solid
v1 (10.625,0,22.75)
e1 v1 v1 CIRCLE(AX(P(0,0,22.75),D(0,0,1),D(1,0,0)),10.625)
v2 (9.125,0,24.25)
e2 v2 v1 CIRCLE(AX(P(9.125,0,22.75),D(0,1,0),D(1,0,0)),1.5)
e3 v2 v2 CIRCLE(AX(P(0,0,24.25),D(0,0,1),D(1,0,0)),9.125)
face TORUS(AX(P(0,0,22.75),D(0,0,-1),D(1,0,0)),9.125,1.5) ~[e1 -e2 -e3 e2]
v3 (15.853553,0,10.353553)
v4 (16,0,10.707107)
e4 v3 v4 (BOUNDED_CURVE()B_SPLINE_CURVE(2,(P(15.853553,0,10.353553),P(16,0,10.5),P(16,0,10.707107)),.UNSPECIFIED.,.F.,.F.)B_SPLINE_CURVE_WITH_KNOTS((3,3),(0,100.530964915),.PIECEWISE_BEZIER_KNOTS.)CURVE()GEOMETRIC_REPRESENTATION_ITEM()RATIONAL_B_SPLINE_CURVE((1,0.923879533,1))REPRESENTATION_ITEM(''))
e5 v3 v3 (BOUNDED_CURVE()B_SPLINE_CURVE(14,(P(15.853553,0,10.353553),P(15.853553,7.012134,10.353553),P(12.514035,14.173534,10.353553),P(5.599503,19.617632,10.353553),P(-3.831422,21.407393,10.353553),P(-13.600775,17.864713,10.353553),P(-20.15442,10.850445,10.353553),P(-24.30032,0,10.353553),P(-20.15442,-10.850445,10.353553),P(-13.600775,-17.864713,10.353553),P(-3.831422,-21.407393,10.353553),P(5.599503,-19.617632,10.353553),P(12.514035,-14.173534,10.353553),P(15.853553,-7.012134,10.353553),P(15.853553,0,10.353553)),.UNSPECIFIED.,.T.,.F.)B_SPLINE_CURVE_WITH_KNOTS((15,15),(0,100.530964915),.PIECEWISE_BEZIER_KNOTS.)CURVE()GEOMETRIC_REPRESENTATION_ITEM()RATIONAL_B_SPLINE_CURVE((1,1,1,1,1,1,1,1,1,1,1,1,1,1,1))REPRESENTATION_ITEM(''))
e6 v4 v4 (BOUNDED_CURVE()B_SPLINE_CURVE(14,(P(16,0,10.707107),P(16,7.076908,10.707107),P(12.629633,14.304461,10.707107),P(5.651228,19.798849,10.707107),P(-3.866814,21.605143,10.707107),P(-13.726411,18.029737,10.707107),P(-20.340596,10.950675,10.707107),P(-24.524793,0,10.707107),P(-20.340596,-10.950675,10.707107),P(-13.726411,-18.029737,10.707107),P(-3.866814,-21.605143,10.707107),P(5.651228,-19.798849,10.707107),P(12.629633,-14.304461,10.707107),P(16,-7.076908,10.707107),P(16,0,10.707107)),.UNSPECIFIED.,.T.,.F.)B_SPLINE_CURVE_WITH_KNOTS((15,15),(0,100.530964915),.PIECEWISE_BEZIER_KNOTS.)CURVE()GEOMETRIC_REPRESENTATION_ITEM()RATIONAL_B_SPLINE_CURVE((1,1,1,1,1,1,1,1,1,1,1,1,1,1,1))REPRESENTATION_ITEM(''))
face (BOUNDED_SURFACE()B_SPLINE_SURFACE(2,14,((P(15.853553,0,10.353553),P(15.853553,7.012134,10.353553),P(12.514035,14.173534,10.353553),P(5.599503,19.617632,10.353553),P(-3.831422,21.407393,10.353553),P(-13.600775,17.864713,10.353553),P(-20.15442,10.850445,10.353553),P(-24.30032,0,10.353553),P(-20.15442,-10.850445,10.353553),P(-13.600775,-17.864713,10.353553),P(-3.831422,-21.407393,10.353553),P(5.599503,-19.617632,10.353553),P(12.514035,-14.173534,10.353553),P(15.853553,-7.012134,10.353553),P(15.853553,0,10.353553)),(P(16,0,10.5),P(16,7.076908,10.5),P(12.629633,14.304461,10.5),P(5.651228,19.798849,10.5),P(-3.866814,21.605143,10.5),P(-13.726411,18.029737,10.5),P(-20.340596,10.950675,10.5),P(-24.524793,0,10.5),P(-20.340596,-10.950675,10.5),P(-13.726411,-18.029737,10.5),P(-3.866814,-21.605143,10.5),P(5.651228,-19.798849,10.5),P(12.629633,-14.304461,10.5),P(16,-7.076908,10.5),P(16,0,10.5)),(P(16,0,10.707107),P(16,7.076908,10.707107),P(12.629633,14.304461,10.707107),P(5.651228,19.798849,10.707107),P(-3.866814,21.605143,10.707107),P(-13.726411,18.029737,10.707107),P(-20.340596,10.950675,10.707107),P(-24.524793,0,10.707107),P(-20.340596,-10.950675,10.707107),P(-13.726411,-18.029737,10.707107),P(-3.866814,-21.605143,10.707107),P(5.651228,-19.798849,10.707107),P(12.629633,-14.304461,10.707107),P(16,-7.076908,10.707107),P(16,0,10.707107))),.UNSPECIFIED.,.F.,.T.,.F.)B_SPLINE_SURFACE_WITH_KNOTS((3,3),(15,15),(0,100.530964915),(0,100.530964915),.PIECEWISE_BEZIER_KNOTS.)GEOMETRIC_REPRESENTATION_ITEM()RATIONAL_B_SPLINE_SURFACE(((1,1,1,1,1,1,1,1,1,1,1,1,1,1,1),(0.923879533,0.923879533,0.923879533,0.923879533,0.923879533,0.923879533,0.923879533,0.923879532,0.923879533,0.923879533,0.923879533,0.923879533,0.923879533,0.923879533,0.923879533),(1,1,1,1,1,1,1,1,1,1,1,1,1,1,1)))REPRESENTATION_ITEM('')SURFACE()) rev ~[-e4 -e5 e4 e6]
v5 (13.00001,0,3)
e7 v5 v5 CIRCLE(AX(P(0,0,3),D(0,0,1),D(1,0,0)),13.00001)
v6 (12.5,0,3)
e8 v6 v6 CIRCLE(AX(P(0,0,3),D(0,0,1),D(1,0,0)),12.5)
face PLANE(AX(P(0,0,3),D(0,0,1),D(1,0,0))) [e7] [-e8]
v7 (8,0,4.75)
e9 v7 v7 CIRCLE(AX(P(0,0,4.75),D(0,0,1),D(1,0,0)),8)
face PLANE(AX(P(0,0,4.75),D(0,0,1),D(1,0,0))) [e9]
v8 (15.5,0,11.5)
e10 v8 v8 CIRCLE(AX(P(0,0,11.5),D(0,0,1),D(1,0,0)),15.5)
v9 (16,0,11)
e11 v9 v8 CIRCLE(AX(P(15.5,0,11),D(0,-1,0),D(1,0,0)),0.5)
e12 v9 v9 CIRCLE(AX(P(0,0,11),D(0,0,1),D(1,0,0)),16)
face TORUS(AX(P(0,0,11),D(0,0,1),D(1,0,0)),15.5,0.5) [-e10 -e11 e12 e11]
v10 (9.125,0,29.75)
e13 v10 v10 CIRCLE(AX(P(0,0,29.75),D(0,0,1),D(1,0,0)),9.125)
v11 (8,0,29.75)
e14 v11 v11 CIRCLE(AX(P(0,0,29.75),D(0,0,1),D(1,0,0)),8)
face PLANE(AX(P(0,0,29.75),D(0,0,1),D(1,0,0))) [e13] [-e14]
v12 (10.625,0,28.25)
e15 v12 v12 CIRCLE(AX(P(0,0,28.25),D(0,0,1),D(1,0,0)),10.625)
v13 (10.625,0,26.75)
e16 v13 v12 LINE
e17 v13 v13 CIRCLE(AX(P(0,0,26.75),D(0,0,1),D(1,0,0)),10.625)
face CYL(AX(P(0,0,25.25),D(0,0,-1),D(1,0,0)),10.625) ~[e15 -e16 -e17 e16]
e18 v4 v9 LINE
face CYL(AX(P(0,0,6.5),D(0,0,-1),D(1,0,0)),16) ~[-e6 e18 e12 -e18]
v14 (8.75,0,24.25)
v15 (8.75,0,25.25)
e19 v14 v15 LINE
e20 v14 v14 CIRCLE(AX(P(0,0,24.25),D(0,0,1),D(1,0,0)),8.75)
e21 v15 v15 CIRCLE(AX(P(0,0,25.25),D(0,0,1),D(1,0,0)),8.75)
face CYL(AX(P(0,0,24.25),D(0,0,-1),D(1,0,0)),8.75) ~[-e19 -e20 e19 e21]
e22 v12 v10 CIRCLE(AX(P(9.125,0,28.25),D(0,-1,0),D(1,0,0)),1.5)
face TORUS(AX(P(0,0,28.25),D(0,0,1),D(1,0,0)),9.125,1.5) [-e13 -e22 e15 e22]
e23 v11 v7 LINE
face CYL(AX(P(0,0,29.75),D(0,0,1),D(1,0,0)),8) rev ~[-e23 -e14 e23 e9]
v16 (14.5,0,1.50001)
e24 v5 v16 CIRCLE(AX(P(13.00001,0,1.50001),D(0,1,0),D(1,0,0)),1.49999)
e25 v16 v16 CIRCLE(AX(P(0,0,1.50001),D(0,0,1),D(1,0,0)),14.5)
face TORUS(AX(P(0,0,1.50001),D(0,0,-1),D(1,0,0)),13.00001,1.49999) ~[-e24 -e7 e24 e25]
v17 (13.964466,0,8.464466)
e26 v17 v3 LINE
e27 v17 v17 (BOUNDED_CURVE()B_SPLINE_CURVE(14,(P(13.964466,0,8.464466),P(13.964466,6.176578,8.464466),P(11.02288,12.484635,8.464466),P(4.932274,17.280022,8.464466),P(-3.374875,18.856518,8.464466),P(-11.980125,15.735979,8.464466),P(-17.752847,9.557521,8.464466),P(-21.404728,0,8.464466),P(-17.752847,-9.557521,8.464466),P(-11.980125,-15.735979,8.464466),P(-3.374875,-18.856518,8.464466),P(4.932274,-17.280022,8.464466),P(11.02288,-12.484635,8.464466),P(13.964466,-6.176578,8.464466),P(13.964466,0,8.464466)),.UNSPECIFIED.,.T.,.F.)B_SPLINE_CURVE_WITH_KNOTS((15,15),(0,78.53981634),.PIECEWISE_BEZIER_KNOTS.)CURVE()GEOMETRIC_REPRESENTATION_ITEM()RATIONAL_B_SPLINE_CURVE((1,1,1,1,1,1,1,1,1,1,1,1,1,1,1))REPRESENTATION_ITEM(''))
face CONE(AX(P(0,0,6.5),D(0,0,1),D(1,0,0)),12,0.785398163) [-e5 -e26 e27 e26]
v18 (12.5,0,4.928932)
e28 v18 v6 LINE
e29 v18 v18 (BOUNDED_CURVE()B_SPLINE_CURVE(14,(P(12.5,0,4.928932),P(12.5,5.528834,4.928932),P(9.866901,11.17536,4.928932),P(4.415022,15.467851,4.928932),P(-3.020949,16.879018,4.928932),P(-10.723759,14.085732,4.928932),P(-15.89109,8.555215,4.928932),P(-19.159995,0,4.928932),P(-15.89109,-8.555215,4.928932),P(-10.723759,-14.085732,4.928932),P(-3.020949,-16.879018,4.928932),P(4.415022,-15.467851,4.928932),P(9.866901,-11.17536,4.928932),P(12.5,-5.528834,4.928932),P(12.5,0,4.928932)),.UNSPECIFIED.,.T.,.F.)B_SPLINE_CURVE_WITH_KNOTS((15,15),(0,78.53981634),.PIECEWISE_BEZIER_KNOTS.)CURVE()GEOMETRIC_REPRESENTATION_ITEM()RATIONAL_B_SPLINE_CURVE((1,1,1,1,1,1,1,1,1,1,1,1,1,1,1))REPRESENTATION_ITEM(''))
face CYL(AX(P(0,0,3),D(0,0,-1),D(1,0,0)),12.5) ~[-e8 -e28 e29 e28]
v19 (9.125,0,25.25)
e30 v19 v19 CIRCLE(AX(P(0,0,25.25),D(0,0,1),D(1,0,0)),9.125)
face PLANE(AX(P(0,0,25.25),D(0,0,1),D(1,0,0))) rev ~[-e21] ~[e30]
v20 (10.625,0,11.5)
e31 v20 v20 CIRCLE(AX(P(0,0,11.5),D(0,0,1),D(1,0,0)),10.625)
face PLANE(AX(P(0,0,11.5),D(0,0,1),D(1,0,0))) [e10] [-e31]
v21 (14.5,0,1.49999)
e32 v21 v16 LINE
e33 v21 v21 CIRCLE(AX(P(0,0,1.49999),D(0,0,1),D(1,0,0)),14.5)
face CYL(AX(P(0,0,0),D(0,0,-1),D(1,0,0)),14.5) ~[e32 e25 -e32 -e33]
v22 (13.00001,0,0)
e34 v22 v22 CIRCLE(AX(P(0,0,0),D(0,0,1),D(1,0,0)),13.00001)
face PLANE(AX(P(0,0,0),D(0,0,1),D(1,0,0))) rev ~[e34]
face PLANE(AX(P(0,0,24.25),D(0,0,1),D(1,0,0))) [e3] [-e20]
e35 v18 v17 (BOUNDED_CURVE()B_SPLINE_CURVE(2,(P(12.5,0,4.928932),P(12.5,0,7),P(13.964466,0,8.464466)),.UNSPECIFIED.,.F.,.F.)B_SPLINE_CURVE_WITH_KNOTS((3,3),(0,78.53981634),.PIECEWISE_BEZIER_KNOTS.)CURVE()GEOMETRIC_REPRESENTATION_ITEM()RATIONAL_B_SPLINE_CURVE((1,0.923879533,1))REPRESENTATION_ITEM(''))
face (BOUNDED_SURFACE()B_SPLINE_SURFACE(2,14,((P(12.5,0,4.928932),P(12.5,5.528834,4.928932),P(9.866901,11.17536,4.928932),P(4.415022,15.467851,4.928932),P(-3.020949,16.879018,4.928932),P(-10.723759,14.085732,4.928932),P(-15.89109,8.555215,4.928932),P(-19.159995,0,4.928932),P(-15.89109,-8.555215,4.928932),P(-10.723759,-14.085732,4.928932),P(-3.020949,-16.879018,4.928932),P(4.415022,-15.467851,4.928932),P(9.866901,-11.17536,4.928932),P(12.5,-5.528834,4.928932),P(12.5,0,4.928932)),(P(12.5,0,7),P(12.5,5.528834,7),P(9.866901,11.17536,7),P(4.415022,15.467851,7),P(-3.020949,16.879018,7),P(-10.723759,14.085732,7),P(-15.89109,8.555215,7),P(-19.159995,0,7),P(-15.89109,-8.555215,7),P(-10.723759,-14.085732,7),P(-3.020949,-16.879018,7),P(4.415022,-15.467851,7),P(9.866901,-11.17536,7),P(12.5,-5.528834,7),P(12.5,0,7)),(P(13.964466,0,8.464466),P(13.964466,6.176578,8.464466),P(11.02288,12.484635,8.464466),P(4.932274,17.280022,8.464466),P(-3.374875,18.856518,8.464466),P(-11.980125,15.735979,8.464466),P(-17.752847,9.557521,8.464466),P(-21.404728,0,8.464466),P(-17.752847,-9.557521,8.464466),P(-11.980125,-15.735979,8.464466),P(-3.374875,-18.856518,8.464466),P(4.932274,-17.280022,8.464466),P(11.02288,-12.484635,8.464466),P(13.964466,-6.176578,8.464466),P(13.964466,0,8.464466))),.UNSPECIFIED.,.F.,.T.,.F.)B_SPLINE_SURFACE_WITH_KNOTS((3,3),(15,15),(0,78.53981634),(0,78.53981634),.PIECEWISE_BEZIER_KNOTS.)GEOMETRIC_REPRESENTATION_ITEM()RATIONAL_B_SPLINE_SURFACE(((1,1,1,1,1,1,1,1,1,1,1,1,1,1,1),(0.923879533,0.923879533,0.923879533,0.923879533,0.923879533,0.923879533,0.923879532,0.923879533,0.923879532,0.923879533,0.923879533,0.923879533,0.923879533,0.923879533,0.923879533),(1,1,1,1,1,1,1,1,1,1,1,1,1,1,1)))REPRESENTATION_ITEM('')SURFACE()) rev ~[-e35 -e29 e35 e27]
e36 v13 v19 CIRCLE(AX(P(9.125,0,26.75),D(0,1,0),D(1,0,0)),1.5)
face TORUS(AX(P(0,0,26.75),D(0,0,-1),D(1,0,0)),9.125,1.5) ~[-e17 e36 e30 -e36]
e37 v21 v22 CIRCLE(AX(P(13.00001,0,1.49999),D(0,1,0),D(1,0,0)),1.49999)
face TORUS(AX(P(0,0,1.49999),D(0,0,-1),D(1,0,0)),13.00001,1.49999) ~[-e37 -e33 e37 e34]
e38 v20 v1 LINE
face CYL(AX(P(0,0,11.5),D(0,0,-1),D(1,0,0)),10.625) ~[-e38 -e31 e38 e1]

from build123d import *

# Parameters (mm, degrees)
F0_R        = 14.5
F1_DEPTH    = 3
F3_R        = 12.5
F4_DEPTH    = 3.5
F6_R        = 16
F7_DEPTH    = 5
F8_R        = 1.49999
F9_S5_R     = 12.5
F9_T6_DEPTH = 24
F10_R       = 5
F11_R       = 0.5
F13_R       = 10.625
F14_DEPTH   = 12.75
F16_R       = 8.75
F17_DEPTH   = 1
F19_R       = 10.625
F20_DEPTH   = 4.5
F21_R       = 1.5
F23_R       = 8
F24_DEPTH   = 25


# Not quite as in the source:
# - a fillet or chamfer that OpenCascade refuses, or shapes differently, is made with other operations: its cross-section is extruded or revolved along the edge and cut away or added
# - a fillet or chamfer is up to 0.001 mm smaller than in the source, because OpenCascade refuses the exact size


with BuildPart() as f1:
    # F0 (on Top) → F1 (new body)
    with BuildSketch(Plane.XY):
        Circle(F0_R)
    extrude(amount=F1_DEPTH)

    # F3 (on offset) → F4 (join)
    with BuildSketch(Plane.XY.offset(3)):
        Circle(F3_R)
    extrude(amount=F4_DEPTH)

    # F6 (on offset) → F7 (join)
    with BuildSketch(Plane.XY.offset(6.5)):
        Circle(F6_R)
    extrude(amount=F7_DEPTH)

    # F8 (radius 1.5 in the source; OpenCascade refuses exactly that, so slightly less here)
    f8_edges = [f1.edges().sort_by_distance(p)[0] for p in [
        (-14.5, 0, 0),
        (-14.5, 0, 3),
    ]]
    fillet(f8_edges, radius=F8_R)

    # F9: chamfer of 4 on 1 edges, made by hand


with BuildPart() as f9_tool2:
    # F9_s3 → F9_t4 (revolve)
    with BuildSketch(Plane.XZ):
        Polygon((12, 6.5), (16, 10.5), (16, 6.5), align=None)
    revolve(axis=Axis((0, 0, 6.5), (0, 0, 1)))

    # F9_s5 → F9_t6 (cut, symmetric)
    with BuildSketch(Plane.XY.offset(8.5)):
        Circle(F9_S5_R)
    extrude(amount=F9_T6_DEPTH, both=True, mode=Mode.SUBTRACT)


with BuildPart() as f1_1:
    add(f1.part)

    # F9_t1: cut F9_tool2
    add(f9_tool2.part, mode=Mode.SUBTRACT)

    # F10
    f10_edges = [f1_1.edges().sort_by_distance(p)[0] for p in [
        (-12.5, 0, 7),
    ]]
    fillet(f10_edges, radius=F10_R)

    # F11
    f11_edges = [f1_1.edges().sort_by_distance(p)[0] for p in [
        (-16, 0, 10.5),
        (-16, 0, 11.5),
    ]]
    fillet(f11_edges, radius=F11_R)

    # F13 (on offset) → F14 (join)
    with BuildSketch(Plane.XY.offset(11.5)):
        Circle(F13_R)
    extrude(amount=F14_DEPTH)

    # F16 (on offset) → F17 (join)
    with BuildSketch(Plane.XY.offset(24.25)):
        Circle(F16_R)
    extrude(amount=F17_DEPTH)

    # F19 (on offset) → F20 (join)
    with BuildSketch(Plane.XY.offset(25.25)):
        Circle(F19_R)
    extrude(amount=F20_DEPTH)

    # F21
    f21_edges = [f1_1.edges().sort_by_distance(p)[0] for p in [
        (-10.625, 0, 24.25),
        (-10.625, 0, 25.25),
        (-10.625, 0, 29.75),
    ]]
    fillet(f21_edges, radius=F21_R)

    # F23 (on offset) → F24 (cut)
    with BuildSketch(Plane.XY.offset(29.75)):
        Circle(F23_R)
    extrude(amount=-F24_DEPTH, mode=Mode.SUBTRACT)


solid = f1_1.part
